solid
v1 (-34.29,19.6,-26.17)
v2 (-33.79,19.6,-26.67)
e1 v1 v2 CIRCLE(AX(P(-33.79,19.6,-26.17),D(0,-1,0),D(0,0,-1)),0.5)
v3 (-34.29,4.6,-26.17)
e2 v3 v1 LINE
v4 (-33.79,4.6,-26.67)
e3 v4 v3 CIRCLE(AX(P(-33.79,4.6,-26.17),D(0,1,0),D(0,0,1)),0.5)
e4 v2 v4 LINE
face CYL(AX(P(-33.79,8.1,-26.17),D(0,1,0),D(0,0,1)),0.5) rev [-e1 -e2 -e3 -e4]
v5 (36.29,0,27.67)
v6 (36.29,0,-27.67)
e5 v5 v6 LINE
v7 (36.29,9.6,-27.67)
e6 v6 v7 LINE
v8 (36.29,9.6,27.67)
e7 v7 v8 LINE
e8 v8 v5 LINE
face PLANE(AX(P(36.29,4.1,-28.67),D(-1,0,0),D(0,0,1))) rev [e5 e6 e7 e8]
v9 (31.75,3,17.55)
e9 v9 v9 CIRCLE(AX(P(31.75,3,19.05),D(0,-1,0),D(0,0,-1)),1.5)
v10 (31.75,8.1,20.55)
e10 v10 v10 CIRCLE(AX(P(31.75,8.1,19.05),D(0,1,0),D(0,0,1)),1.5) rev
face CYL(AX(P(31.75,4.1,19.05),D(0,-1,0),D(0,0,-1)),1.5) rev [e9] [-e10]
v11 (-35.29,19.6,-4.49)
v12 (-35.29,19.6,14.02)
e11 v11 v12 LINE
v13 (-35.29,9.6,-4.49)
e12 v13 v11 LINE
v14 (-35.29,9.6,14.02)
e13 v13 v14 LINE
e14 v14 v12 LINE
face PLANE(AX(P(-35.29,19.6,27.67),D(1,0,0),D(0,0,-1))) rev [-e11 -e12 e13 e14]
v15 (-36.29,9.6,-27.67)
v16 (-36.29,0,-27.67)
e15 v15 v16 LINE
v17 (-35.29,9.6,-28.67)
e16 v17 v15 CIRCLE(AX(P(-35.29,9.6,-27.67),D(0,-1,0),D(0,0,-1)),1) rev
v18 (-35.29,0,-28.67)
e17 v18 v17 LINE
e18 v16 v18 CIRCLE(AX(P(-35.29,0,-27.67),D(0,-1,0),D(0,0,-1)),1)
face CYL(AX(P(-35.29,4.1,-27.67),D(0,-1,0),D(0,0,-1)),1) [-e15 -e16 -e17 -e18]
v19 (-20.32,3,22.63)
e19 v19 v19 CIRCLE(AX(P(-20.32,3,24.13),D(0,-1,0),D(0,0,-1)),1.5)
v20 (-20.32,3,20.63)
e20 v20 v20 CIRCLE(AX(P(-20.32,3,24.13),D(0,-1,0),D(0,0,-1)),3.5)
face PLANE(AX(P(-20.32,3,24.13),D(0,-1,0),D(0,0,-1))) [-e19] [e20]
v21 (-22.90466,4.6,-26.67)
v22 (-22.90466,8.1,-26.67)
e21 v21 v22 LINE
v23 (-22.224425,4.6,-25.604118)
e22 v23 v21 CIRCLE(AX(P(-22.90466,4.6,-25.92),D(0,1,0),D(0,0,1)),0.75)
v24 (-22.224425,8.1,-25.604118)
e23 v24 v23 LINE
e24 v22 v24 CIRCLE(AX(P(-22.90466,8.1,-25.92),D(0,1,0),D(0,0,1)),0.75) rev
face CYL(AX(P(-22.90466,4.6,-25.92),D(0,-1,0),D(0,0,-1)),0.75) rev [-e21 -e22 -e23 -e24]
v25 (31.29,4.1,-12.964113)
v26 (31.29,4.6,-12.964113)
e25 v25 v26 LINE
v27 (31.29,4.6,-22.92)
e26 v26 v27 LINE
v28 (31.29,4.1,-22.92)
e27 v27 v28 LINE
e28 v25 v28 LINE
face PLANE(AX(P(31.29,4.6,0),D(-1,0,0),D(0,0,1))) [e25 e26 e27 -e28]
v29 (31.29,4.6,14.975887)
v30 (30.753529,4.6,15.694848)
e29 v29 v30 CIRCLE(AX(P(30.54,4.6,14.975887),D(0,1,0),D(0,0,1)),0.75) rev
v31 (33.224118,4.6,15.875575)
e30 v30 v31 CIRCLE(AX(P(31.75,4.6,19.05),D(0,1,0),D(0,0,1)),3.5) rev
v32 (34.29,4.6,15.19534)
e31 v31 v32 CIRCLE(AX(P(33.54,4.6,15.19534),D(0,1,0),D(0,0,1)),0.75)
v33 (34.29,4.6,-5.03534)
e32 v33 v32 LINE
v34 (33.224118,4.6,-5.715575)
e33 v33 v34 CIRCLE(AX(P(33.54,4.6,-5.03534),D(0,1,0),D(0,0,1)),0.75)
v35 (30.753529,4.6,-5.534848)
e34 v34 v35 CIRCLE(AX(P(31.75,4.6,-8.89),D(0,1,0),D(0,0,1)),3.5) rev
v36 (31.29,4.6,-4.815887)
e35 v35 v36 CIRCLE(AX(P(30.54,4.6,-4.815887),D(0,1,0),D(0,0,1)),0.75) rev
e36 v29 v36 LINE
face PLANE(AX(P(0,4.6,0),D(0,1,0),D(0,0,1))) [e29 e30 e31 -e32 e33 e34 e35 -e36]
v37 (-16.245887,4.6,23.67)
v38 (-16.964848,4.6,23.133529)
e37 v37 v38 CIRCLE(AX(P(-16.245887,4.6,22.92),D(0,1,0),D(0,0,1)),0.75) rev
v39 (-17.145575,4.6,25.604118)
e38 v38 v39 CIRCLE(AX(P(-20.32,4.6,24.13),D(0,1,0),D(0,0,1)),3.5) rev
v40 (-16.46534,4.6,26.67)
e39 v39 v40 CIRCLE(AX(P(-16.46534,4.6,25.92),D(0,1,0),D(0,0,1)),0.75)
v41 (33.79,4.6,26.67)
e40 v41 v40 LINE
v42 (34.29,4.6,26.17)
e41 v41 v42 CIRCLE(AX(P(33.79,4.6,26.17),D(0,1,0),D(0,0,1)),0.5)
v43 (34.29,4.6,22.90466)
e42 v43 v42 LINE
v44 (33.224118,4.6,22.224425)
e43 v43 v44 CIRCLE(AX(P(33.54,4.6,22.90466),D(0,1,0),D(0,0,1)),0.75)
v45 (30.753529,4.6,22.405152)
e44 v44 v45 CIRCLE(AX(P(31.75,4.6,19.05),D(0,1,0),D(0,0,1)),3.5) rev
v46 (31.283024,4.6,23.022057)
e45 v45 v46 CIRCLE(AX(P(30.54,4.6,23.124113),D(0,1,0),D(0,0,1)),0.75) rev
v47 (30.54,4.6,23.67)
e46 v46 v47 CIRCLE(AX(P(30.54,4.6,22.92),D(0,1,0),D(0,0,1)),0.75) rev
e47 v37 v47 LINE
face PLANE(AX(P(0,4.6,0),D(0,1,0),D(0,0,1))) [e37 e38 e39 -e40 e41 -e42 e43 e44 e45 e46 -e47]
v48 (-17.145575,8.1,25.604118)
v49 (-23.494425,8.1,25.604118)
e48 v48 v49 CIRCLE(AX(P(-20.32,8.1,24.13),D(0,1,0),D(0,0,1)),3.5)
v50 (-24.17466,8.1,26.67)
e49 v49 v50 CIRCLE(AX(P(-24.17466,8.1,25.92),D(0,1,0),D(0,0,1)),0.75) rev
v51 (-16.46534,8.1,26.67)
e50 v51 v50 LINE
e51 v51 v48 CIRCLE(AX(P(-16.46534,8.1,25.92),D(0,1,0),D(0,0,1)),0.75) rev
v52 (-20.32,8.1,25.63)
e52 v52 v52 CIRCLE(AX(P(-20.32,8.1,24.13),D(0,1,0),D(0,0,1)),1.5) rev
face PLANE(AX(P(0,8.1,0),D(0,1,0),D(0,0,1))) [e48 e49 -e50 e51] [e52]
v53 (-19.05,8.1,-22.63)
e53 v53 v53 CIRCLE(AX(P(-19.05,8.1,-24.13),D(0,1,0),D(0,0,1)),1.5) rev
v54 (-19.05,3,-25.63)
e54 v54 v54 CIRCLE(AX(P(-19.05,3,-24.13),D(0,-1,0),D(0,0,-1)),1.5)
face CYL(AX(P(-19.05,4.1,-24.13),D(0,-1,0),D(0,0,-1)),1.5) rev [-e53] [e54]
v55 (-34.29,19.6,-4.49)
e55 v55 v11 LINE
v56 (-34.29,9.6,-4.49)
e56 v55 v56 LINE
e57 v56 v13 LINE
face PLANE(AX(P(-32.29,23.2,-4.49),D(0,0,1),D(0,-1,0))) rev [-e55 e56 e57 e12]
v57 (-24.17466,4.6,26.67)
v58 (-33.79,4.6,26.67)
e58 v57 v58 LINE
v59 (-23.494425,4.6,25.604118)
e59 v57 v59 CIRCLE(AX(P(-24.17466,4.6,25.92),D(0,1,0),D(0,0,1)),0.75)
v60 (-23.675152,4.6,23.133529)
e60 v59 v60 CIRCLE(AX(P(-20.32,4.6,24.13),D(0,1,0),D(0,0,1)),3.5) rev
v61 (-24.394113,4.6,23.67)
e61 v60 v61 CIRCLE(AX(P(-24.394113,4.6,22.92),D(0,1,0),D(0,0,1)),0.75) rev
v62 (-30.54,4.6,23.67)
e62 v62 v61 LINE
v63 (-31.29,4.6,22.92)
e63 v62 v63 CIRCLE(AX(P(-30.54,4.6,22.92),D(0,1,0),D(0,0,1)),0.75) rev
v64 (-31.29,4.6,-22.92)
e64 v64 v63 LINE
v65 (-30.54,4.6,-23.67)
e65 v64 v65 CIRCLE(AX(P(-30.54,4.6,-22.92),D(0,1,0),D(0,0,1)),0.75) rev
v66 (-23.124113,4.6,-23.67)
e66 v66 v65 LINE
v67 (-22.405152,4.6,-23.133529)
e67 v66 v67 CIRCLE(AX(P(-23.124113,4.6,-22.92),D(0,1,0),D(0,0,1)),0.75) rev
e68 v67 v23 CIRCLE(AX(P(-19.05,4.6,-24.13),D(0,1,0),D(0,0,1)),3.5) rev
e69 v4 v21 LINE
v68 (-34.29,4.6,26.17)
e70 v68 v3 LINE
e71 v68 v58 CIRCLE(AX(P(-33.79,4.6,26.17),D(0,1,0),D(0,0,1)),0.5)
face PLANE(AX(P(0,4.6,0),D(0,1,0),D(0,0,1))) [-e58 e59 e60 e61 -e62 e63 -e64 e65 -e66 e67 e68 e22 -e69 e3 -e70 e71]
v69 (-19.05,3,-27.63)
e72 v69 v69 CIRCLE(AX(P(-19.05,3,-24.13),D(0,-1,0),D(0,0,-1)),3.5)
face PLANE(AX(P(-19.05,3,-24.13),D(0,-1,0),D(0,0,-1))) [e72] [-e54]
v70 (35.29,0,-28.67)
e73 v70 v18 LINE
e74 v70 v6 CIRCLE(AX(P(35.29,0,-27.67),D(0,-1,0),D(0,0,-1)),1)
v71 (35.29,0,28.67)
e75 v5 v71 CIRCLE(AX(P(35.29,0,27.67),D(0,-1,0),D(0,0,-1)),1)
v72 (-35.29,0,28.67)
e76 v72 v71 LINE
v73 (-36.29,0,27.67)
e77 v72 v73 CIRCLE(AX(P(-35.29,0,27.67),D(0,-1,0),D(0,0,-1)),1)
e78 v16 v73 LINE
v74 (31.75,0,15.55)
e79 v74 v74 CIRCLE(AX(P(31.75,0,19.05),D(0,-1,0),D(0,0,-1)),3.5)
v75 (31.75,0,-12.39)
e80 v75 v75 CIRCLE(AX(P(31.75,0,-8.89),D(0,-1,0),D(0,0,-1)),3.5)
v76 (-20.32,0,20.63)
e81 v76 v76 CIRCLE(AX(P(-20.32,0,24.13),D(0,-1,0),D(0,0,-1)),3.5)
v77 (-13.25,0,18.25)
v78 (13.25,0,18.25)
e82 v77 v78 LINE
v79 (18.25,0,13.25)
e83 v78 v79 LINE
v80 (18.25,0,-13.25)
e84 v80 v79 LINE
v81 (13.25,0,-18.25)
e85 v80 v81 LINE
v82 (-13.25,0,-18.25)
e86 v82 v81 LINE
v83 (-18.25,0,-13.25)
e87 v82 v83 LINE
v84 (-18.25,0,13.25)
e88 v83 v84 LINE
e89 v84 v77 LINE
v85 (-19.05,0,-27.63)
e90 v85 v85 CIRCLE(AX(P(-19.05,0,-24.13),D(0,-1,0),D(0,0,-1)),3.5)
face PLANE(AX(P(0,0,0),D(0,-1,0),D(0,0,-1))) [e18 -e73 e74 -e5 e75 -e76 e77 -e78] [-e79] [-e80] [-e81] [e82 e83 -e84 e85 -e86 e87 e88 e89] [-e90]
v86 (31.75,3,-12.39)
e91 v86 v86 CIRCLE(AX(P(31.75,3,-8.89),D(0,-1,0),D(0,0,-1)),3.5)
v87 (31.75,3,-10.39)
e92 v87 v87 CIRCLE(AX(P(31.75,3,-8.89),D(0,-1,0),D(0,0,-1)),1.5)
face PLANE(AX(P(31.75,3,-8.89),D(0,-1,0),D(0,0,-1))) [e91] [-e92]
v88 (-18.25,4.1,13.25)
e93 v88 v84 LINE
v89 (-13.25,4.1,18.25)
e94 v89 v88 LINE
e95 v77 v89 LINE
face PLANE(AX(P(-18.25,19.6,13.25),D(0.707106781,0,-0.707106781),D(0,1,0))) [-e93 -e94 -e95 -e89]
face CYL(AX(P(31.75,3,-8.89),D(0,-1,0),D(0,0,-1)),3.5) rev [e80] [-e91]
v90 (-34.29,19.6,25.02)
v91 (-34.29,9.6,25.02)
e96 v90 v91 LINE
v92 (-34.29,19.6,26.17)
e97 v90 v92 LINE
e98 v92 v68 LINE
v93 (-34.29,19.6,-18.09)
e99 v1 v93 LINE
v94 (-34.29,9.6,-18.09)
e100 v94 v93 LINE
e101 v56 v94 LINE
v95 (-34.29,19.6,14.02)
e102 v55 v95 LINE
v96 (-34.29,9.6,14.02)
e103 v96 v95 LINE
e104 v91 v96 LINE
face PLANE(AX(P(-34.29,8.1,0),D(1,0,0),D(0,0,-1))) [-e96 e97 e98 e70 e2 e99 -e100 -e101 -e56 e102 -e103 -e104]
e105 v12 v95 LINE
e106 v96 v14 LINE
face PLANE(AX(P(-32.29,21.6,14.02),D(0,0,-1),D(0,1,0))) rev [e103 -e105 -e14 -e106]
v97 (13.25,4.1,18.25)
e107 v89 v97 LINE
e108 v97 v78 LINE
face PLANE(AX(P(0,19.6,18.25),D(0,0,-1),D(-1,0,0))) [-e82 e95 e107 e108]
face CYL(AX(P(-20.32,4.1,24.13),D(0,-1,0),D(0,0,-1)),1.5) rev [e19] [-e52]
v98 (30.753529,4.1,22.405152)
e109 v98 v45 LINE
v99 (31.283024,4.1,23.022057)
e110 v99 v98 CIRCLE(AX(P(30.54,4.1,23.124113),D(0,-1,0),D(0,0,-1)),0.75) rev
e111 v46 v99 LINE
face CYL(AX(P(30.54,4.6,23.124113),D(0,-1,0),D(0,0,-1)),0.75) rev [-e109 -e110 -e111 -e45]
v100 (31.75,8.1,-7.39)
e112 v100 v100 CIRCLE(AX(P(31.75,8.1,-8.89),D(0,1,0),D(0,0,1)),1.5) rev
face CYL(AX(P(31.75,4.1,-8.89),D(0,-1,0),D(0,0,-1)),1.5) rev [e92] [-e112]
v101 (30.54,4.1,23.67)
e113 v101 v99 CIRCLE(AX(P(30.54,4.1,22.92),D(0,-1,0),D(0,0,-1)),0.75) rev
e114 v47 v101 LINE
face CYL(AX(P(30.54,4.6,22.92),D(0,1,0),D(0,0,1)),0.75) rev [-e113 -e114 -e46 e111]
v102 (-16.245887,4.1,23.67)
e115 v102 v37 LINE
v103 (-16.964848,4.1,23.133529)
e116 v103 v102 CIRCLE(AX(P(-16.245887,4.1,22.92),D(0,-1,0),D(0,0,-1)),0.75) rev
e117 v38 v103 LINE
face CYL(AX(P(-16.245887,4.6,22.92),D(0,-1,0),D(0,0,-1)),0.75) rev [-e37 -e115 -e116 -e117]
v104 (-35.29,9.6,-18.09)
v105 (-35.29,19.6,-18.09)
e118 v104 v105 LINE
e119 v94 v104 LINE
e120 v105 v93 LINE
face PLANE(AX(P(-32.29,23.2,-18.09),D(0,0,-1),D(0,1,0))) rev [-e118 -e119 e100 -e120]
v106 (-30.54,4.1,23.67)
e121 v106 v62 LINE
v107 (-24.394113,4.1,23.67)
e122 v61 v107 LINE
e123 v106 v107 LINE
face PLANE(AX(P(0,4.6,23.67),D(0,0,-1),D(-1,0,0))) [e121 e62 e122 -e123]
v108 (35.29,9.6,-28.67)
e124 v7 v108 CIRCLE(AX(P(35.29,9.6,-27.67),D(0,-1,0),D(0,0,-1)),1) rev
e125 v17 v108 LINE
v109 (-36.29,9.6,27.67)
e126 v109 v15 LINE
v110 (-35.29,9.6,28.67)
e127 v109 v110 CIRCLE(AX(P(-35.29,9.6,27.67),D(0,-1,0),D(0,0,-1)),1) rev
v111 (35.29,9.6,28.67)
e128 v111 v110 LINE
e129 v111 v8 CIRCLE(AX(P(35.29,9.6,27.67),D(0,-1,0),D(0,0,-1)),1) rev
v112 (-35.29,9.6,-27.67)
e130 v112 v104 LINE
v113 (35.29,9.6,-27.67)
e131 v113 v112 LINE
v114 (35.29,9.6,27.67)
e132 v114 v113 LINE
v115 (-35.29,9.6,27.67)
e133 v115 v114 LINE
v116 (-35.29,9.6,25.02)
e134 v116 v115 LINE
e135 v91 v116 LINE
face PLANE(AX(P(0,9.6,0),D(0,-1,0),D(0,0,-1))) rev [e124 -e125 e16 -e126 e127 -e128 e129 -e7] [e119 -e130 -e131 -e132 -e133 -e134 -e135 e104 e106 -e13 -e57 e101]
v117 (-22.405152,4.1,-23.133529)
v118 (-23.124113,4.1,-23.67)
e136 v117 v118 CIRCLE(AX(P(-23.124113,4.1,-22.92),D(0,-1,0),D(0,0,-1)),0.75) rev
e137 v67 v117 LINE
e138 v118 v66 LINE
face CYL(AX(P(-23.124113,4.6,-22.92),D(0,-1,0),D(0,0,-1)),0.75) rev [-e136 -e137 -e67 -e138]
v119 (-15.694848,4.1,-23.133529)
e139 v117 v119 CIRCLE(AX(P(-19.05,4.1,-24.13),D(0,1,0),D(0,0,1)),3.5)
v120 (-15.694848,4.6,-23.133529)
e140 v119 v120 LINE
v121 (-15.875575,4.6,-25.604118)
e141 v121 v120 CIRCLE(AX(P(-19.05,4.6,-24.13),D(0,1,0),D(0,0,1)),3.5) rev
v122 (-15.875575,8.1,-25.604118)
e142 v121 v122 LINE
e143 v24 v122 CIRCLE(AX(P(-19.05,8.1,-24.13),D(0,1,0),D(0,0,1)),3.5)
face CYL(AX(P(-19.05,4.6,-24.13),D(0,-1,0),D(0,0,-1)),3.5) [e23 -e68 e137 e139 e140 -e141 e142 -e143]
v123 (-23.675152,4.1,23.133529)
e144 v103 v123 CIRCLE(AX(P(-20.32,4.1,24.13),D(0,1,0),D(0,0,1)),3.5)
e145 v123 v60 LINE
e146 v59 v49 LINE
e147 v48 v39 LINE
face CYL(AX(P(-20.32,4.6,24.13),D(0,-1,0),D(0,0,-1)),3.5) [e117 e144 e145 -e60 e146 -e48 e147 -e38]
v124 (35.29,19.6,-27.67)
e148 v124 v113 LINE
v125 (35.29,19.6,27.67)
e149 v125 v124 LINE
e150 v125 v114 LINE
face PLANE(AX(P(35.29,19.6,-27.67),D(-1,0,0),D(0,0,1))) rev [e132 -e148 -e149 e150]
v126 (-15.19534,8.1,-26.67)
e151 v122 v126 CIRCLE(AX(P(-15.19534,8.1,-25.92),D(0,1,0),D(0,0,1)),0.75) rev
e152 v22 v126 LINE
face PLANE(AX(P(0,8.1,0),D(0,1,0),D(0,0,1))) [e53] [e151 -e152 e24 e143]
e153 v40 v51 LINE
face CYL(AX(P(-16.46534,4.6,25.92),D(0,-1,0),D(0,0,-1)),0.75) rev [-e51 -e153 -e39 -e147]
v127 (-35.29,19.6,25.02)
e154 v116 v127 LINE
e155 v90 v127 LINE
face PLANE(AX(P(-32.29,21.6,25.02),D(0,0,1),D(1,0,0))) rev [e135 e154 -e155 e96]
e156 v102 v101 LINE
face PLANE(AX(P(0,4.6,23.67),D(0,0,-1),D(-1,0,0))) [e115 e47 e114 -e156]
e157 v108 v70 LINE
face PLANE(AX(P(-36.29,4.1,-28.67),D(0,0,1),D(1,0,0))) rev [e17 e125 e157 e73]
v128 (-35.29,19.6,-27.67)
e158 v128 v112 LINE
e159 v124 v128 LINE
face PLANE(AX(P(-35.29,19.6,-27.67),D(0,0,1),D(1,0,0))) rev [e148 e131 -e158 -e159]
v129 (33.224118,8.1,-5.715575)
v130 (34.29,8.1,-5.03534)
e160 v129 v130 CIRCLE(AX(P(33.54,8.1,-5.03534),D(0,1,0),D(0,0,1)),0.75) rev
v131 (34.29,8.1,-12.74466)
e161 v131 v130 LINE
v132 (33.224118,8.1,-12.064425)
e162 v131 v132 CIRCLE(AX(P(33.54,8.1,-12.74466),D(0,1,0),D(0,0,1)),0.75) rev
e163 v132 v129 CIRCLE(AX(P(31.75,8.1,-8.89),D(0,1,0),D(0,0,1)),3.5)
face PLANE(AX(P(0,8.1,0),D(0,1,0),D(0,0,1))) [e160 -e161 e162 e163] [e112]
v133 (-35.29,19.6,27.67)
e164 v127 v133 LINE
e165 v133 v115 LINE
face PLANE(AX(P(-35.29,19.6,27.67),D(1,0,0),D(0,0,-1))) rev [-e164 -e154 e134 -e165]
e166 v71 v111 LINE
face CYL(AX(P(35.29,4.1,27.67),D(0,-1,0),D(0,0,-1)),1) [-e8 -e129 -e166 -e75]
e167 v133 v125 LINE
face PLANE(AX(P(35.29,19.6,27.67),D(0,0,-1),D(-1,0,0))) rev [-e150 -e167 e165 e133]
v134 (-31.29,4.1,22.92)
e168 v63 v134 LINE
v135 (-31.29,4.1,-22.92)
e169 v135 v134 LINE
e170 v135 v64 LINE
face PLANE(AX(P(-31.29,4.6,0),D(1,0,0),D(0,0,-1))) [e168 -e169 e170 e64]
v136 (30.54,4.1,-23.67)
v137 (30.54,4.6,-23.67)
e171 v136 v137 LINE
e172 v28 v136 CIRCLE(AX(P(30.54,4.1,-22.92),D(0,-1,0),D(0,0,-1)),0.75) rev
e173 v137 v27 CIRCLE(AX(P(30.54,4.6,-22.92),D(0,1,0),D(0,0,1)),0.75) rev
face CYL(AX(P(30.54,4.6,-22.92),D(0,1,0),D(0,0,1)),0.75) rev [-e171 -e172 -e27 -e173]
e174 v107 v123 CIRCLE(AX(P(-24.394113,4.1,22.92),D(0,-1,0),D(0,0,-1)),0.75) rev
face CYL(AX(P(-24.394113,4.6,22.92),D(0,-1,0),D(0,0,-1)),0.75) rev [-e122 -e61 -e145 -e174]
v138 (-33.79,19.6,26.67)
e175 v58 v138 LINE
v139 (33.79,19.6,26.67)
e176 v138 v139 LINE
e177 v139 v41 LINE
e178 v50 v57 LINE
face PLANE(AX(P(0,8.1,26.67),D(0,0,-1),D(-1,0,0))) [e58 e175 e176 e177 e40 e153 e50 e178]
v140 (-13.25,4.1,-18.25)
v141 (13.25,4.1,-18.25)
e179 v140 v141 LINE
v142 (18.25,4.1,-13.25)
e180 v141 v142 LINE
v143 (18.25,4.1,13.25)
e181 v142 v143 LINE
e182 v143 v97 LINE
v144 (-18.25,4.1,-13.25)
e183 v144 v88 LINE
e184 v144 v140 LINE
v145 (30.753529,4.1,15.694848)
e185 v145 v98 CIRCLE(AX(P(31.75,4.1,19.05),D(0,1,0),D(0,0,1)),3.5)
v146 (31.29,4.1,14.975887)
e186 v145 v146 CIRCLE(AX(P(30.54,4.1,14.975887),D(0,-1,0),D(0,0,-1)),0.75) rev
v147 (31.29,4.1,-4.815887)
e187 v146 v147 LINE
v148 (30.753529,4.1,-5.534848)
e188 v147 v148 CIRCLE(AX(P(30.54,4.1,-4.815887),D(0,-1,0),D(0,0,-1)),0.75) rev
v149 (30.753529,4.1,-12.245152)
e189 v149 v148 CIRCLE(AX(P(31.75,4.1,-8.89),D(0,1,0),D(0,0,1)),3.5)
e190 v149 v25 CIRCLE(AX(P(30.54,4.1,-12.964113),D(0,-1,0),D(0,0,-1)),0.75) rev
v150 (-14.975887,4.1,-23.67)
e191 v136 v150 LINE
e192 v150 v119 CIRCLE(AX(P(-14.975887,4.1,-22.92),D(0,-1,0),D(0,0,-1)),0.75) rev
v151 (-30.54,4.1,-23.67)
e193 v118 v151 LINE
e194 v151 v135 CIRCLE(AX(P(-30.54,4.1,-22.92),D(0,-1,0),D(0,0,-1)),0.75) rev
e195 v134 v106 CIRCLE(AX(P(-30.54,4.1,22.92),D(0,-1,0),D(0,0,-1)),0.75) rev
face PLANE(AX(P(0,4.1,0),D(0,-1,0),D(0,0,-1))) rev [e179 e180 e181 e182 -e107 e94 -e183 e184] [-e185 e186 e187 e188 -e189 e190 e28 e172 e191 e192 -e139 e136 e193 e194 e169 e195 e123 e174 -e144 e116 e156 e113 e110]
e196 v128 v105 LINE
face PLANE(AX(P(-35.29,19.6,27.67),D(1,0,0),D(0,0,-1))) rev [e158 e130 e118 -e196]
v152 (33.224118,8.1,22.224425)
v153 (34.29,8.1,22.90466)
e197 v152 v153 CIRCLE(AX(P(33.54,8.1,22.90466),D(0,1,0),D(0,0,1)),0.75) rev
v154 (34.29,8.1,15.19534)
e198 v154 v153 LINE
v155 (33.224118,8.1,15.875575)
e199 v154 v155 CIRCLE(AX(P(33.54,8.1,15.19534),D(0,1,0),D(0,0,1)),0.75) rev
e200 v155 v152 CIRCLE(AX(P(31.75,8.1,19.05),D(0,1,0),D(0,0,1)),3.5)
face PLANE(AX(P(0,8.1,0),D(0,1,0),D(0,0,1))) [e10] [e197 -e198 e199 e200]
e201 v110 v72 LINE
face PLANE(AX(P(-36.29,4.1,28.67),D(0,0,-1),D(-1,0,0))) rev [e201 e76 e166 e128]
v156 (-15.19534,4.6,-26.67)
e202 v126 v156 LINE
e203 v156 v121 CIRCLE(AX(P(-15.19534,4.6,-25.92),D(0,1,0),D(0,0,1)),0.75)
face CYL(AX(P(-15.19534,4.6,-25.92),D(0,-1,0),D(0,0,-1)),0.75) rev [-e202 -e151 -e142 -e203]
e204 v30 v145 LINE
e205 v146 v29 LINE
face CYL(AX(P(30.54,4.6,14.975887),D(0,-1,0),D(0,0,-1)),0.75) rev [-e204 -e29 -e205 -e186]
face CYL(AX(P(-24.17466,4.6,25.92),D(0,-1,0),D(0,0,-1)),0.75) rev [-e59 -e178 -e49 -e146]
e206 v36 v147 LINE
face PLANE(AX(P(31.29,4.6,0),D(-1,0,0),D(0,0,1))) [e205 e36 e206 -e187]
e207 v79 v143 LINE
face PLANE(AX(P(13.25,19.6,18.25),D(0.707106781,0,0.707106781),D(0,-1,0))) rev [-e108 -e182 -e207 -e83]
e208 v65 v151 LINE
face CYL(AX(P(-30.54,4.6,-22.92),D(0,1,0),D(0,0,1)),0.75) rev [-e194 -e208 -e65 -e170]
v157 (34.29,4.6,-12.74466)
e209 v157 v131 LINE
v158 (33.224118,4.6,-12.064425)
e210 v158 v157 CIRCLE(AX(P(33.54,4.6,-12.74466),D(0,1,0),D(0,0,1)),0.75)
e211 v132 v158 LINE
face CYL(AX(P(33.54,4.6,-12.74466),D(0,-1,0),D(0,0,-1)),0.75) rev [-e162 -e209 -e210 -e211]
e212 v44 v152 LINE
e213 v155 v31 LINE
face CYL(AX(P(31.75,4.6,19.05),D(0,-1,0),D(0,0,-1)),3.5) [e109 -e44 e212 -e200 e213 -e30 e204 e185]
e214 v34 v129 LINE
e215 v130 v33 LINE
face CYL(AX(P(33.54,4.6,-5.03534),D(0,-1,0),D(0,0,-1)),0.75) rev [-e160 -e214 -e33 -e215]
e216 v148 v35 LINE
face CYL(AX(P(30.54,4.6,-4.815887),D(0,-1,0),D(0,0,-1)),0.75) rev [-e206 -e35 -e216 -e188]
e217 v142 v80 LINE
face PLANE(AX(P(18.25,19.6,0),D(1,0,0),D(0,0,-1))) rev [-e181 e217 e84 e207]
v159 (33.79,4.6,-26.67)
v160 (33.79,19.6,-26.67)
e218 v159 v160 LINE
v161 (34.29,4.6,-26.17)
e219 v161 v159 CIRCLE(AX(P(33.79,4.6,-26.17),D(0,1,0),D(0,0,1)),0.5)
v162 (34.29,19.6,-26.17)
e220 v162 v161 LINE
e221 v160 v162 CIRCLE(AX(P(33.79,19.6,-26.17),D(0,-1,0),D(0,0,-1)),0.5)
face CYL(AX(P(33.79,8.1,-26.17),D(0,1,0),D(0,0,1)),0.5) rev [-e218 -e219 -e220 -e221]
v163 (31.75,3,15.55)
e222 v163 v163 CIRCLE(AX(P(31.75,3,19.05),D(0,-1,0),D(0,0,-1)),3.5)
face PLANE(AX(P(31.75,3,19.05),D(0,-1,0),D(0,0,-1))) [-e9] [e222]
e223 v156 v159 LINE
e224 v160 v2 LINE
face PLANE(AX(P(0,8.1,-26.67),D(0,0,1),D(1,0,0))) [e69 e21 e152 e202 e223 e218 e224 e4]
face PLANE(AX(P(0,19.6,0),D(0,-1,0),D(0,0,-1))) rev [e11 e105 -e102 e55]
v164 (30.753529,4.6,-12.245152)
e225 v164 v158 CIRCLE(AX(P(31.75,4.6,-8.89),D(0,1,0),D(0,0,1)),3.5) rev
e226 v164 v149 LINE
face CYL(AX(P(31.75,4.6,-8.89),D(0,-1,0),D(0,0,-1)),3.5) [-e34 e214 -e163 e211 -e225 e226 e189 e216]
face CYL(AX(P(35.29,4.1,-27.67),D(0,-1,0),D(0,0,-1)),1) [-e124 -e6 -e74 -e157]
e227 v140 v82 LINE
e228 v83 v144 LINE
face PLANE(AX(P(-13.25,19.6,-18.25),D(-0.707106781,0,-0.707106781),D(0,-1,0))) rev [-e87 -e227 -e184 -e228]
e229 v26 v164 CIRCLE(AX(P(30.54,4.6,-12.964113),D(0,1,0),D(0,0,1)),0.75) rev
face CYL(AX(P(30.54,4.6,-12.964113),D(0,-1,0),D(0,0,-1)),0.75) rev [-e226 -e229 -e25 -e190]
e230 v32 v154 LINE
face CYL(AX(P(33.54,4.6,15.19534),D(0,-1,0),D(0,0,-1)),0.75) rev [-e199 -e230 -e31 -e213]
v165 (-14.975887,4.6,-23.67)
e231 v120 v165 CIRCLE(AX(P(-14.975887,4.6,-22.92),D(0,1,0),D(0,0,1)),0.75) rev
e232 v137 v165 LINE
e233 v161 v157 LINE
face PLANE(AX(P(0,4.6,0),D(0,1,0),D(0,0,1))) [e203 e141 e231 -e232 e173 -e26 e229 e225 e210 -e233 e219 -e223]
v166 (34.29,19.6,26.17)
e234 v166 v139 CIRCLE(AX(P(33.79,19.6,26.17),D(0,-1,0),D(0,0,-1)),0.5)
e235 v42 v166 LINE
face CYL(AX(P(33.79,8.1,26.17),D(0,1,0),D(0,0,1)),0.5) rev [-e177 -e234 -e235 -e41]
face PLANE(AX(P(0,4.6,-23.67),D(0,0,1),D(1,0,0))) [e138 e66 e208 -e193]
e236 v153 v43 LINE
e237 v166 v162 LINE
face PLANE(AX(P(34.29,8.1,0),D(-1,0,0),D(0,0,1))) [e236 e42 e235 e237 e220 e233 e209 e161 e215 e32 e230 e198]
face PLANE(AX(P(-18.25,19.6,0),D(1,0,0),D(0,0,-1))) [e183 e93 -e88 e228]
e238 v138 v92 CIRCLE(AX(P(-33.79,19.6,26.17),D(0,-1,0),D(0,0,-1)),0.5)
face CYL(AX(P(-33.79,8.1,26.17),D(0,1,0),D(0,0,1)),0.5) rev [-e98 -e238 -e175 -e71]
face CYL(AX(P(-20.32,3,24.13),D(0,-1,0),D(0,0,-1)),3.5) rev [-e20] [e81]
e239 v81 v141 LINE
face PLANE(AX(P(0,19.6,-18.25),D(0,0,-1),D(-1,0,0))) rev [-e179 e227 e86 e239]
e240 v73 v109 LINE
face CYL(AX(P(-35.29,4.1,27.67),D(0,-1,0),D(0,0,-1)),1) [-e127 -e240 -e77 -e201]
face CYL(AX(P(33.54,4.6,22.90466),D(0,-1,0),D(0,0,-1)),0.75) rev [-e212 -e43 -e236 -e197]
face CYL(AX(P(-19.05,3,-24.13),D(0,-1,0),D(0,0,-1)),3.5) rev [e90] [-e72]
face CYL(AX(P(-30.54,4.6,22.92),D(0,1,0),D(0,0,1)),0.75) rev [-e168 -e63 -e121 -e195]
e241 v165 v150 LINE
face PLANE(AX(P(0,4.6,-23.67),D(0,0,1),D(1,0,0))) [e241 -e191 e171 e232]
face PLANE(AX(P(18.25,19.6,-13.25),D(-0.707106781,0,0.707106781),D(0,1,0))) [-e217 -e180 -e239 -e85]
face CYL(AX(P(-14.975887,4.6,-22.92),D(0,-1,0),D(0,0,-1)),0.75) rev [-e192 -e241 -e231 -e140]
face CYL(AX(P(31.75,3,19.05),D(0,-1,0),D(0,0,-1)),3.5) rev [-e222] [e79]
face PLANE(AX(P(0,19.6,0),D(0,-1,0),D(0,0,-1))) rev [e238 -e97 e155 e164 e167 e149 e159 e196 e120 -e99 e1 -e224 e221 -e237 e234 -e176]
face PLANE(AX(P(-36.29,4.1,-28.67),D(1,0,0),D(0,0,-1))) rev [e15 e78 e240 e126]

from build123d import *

# Parameters (mm, degrees)
SKETCH1_W                 = 72.58
SKETCH1_H                 = 57.34
SKETCH1_R                 = 1.5
BOSS_EXTRUDE1_DEPTH       = 4.1
SKETCH2_W                 = 72.58
SKETCH2_H                 = 57.34
SKETCH2_R                 = 1.5
BOSS_EXTRUDE2_DEPTH       = 0.5
SKETCH2_4_W               = 72.58
SKETCH2_4_H               = 57.34
SKETCH2_4_R               = 1.5
BOSS_EXTRUDE3_DEPTH       = 4
BOSS_EXTRUDE4_START       = 4
BOSS_EXTRUDE4_OUTLINE_W   = 72.58
BOSS_EXTRUDE4_OUTLINE_H   = 57.34
BOSS_EXTRUDE4_OUTLINE_W_2 = 68.58
BOSS_EXTRUDE4_OUTLINE_H_2 = 53.34
BOSS_EXTRUDE4_DEPTH       = 1.5
SKETCH4_W                 = 70.58
SKETCH4_H                 = 55.34
SKETCH4_W_2               = 68.58
SKETCH4_H_2               = 53.34
BOSS_EXTRUDE5_DEPTH       = 10
FILLET1_R                 = 1
FILLET2_R                 = 0.5
FILLET3_R                 = 0.75
SKETCH3_W                 = 36.5
SKETCH3_H                 = 36.5
CUT_EXTRUDE1_DEPTH        = 51.230399162
SKETCH6_W                 = 11
SKETCH6_H                 = 12
SKETCH6_W_2               = 13.6
SKETCH6_H_2               = 13.6
CUT_EXTRUDE2_DEPTH        = 3
CHAMFER1_SIZE             = 5
SKETCH7_R                 = 3.5
SKETCH7_R_2               = 1.5
CUT_EXTRUDE3_DEPTH        = 3


# Read off the part's stored shape, not the designer's step: Boss-Extrude4
with BuildPart() as part:
    # Sketch1 → Boss-Extrude1 (new body)
    with BuildSketch(Plane(origin=(0, 0, 0), x_dir=(1, 0, 0), z_dir=(0, 1, 0))):
        Rectangle(SKETCH1_W, SKETCH1_H)
        with Locations(Location((-19.05, 24.13, 0), (0, 0, 270))):
            Circle(SKETCH1_R, mode=Mode.SUBTRACT)
        with Locations(Location((31.75, 8.89, 0), (0, 0, 270))):
            Circle(SKETCH1_R, mode=Mode.SUBTRACT)
        with Locations(Location((31.75, -19.05, 0), (0, 0, 270))):
            Circle(SKETCH1_R, mode=Mode.SUBTRACT)
        with Locations(Location((-20.32, -24.13, 0), (0, 0, 270))):
            Circle(SKETCH1_R, mode=Mode.SUBTRACT)
    extrude(amount=BOSS_EXTRUDE1_DEPTH)

    # Sketch2 → Boss-Extrude2 (add)
    with BuildSketch(Plane(origin=(0, 4.1, 0), x_dir=(1, 0, 0), z_dir=(0, 1, 0))):
        Rectangle(SKETCH2_W, SKETCH2_H)
        with BuildLine():
            Line((-31.29, -23.67), (-31.29, 23.67))
            Line((-31.29, 23.67), (-22.519639751, 23.67))
            ThreePointArc((-22.519639751, 23.67), (-19.05, 20.63), (-15.580360249, 23.67))
            Line((-15.580360249, 23.67), (31.29, 23.67))
            Line((31.29, 23.67), (31.29, 12.359639751))
            ThreePointArc((31.29, 12.359639751), (28.25, 8.89), (31.29, 5.420360249))
            Line((31.29, 5.420360249), (31.29, -15.580360249))
            ThreePointArc((31.29, -15.580360249), (28.25, -19.05), (31.29, -22.519639751))
            Line((31.29, -22.519639751), (31.29, -23.67))
            Line((31.29, -23.67), (-16.850360249, -23.67))
            ThreePointArc((-16.850360249, -23.67), (-20.32, -20.63), (-23.789639751, -23.67))
            Line((-23.789639751, -23.67), (-31.29, -23.67))
        make_face(mode=Mode.SUBTRACT)
        with Locations(Location((31.75, 8.89, 0), (0, 0, 270))):
            Circle(SKETCH2_R, mode=Mode.SUBTRACT)
        with Locations(Location((-19.05, 24.13, 0), (0, 0, 270))):
            Circle(SKETCH2_R, mode=Mode.SUBTRACT)
        with Locations(Location((-20.32, -24.13, 0), (0, 0, 270))):
            Circle(SKETCH2_R, mode=Mode.SUBTRACT)
        with Locations(Location((31.75, -19.05, 0), (0, 0, 270))):
            Circle(SKETCH2_R, mode=Mode.SUBTRACT)
    extrude(amount=BOSS_EXTRUDE2_DEPTH)

    # Sketch2<4> → Boss-Extrude3 (add)
    with BuildSketch(Plane(origin=(0, 4.1, 0), x_dir=(1, 0, 0), z_dir=(0, 1, 0))):
        Rectangle(SKETCH2_4_W, SKETCH2_4_H)
        with BuildLine():
            ThreePointArc((-21.457986711, 26.67), (-19.05, 20.63), (-16.642013289, 26.67))
            Line((-16.642013289, 26.67), (34.29, 26.67))
            Line((34.29, 26.67), (34.29, 11.297986711))
            ThreePointArc((34.29, 11.297986711), (28.25, 8.89), (34.29, 6.482013289))
            Line((34.29, 6.482013289), (34.29, -16.642013289))
            ThreePointArc((34.29, -16.642013289), (28.25, -19.05), (34.29, -21.457986711))
            Line((34.29, -21.457986711), (34.29, -26.67))
            Line((34.29, -26.67), (-17.912013289, -26.67))
            ThreePointArc((-17.912013289, -26.67), (-20.32, -20.63), (-22.727986711, -26.67))
            Line((-22.727986711, -26.67), (-34.29, -26.67))
            Line((-34.29, -26.67), (-34.29, 26.67))
            Line((-34.29, 26.67), (-21.457986711, 26.67))
        make_face(mode=Mode.SUBTRACT)
        with Locations(Location((-19.05, 24.13, 0), (0, 0, 270))):
            Circle(SKETCH2_4_R, mode=Mode.SUBTRACT)
        with Locations(Location((-20.32, -24.13, 0), (0, 0, 270))):
            Circle(SKETCH2_4_R, mode=Mode.SUBTRACT)
        with Locations(Location((31.75, -19.05, 0), (0, 0, 270))):
            Circle(SKETCH2_4_R, mode=Mode.SUBTRACT)
        with Locations(Location((31.75, 8.89, 0), (0, 0, 270))):
            Circle(SKETCH2_4_R, mode=Mode.SUBTRACT)
    extrude(amount=BOSS_EXTRUDE3_DEPTH)

    # Boss-Extrude4 outline → Boss-Extrude4 (add)
    with BuildSketch(Plane(origin=(0, 4.1, 0), x_dir=(1, 0, 0), z_dir=(0, 1, 0)).offset(BOSS_EXTRUDE4_START)):
        Rectangle(BOSS_EXTRUDE4_OUTLINE_W, BOSS_EXTRUDE4_OUTLINE_H)
        Rectangle(BOSS_EXTRUDE4_OUTLINE_W_2, BOSS_EXTRUDE4_OUTLINE_H_2, mode=Mode.SUBTRACT)
    extrude(amount=BOSS_EXTRUDE4_DEPTH)

    # Sketch4 → Boss-Extrude5 (add)
    with BuildSketch(Plane(origin=(0, 9.6, 0), x_dir=(1, 0, 0), z_dir=(0, 1, 0))):
        Rectangle(SKETCH4_W, SKETCH4_H)
        Rectangle(SKETCH4_W_2, SKETCH4_H_2, mode=Mode.SUBTRACT)
    extrude(amount=BOSS_EXTRUDE5_DEPTH)

    # Fillet1
    fillet1_edges = [part.edges().sort_by_distance(p)[0] for p in [
        (36.29, 4.8, -28.67),
        (36.29, 4.8, 28.67),
        (-36.29, 4.8, 28.67),
        (-36.29, 4.8, -28.67),
    ]]
    fillet(fillet1_edges, radius=FILLET1_R)

    # Fillet2
    fillet2_edges = [part.edges().sort_by_distance(p)[0] for p in [
        (34.29, 12.1, 26.67),
        (-34.29, 12.1, 26.67),
        (-34.29, 12.1, -26.67),
        (34.29, 12.1, -26.67),
    ]]
    fillet(fillet2_edges, radius=FILLET2_R)

    # Fillet3
    # the kernel refuses this fillet: 0.75 mm, written as the material it adds along each edge
    with BuildSketch(Plane(origin=(-17.912013289, 0.983317982, 26.67), x_dir=(1, 0, 0), z_dir=(0, 1, 0)), Plane(origin=(-21.457986711, 0.983317982, -26.67), x_dir=(-1, 0, 0), z_dir=(0, 1, 0)), Plane(origin=(34.29, 0.983317982, -11.297986711), x_dir=(0, 0, -1), z_dir=(0, 1, 0)), Plane(origin=(34.29, 0.983317982, 16.642013289), x_dir=(0, 0, -1), z_dir=(0, 1, 0))) as fillet3_piece_1:
        with BuildLine():
            CenterArc((1.446672807, 0.75), FILLET3_R, 155.091114703, 114.908885297)
            ThreePointArc((0.766438775, 1.065882353), (0.433642713, 0.496683524), (0, 0))
            Line((0, 0), (1.446672807, 0))
        make_face()
    extrude(amount=7.116682018)
    with BuildSketch(Plane(origin=(-22.727986711, 0.983317982, 26.67), x_dir=(-1, 0, 0), z_dir=(0, 1, 0)), Plane(origin=(-16.642013289, 0.983317982, -26.67), x_dir=(1, 0, 0), z_dir=(0, 1, 0)), Plane(origin=(34.29, 0.983317982, -6.482013289), x_dir=(0, 0, 1), z_dir=(0, 1, 0)), Plane(origin=(34.29, 0.983317982, 21.457986711), x_dir=(0, 0, 1), z_dir=(0, 1, 0))) as fillet3_piece_2:
        with BuildLine():
            CenterArc((1.446672807, -0.75), FILLET3_R, 90, 114.908885297)
            ThreePointArc((0.766438775, -1.065882353), (0.433642713, -0.496683524), (0, 0))
            Line((0, 0), (1.446672807, 0))
        make_face()
    extrude(amount=7.116682018)
    with BuildSketch(Plane(origin=(31.29, 2.225, -23.67), x_dir=(-1, 0, 0), z_dir=(0, 1, 0)), Plane(origin=(31.29, 2.225, 23.67), x_dir=(0, 0, -1), z_dir=(0, 1, 0)), Plane(origin=(-31.29, 2.225, 23.67), x_dir=(1, 0, 0), z_dir=(0, 1, 0)), Plane(origin=(-31.29, 2.225, -23.67), x_dir=(0, 0, 1), z_dir=(0, 1, 0))) as fillet3_piece_3:
        with BuildLine():
            CenterArc((FILLET3_R, FILLET3_R), FILLET3_R, 180, 90)
            Line((0, FILLET3_R), (0, 0))
            Line((0, 0), (FILLET3_R, 0))
        make_face()
    extrude(amount=2.375)
    with BuildSketch(Plane(origin=(31.29, 2.588815876, -12.359639751), x_dir=(-0.977977776437884, 0, 0.20870905297473832), z_dir=(0, 1, 0)), Plane(origin=(31.29, 2.588815876, 15.580360249), x_dir=(-0.9779777764378829, 0, 0.2087090529747441), z_dir=(0, 1, 0)), Plane(origin=(-16.850360249, 2.588815876, 23.67), x_dir=(-0.2087090529747233, 0, -0.9779777764378872), z_dir=(0, 1, 0)), Plane(origin=(-22.519639751, 2.588815876, -23.67), x_dir=(0.20870905297473083, 0, 0.9779777764378856), z_dir=(0, 1, 0))) as fillet3_piece_4:
        with BuildLine():
            CenterArc((0.607324209, -0.747693586), FILLET3_R, 94.494558388, 73.458731432)
            Line((-0.126159123, -0.591161796), (0, 0))
            ThreePointArc((0, 0), (0.274275449, -0.010763267), (0.548550899, 0))
        make_face()
    extrude(amount=2.011184124)
    with BuildSketch(Plane(origin=(31.29, 2.588815876, -5.420360249), x_dir=(-0.9779777764378846, 0, -0.20870905297473547), z_dir=(0, 1, 0)), Plane(origin=(31.29, 2.588815876, 22.519639751), x_dir=(-0.9779777764378821, 0, -0.20870905297474715), z_dir=(0, 1, 0)), Plane(origin=(-23.789639751, 2.588815876, 23.67), x_dir=(0.20870905297472817, 0, -0.9779777764378861), z_dir=(0, 1, 0)), Plane(origin=(-15.580360249, 2.588815876, -23.67), x_dir=(-0.2087090529747233, 0, 0.9779777764378872), z_dir=(0, 1, 0))) as fillet3_piece_5:
        with BuildLine():
            CenterArc((0.607324209, 0.747693586), FILLET3_R, 192.04671018, 73.458731432)
            Line((-0.126159123, 0.591161796), (0, 0))
            ThreePointArc((0, 0), (0.274275449, 0.010763267), (0.548550899, 0))
        make_face()
    extrude(amount=2.011184124)

    # Sketch3 → Cut-Extrude1 (cut, through all)
    with BuildSketch(Plane(origin=(0, 0, 0), x_dir=(1, 0, 0), z_dir=(0, 1, 0))):
        Rectangle(SKETCH3_W, SKETCH3_H)
    extrude(amount=CUT_EXTRUDE1_DEPTH, mode=Mode.SUBTRACT)

    # Sketch6 → Cut-Extrude2 (cut)
    with BuildSketch(Plane.ZY.offset(35.29)):
        with Locations((19.52, 15.6)):
            Rectangle(SKETCH6_W, SKETCH6_H)
        with Locations((-11.29, 16.4)):
            Rectangle(SKETCH6_W_2, SKETCH6_H_2)
    extrude(amount=-CUT_EXTRUDE2_DEPTH, mode=Mode.SUBTRACT)

    # Chamfer1
    chamfer1_edges = [part.edges().sort_by_distance(p)[0] for p in [
        (18.25, 2.05, 18.25),
        (18.25, 2.05, -18.25),
        (-18.25, 2.05, -18.25),
        (-18.25, 2.05, 18.25),
    ]]
    chamfer(chamfer1_edges, length=CHAMFER1_SIZE)

    # Sketch7 → Cut-Extrude3 (cut)
    # profile 1 of 4: a face of its own
    with BuildSketch(Plane.XZ):
        with Locations(Location((-20.32, 24.13, 0), (0, 0, 270))):
            Circle(SKETCH7_R)
        with Locations(Location((-20.32, 24.13, 0), (0, 0, 270))):
            Circle(SKETCH7_R_2, mode=Mode.SUBTRACT)
    # profile 2 of 4: a face of its own
    with BuildSketch(Plane.XZ):
        with Locations(Location((-19.05, -24.13, 0), (0, 0, 270))):
            Circle(SKETCH7_R)
        with Locations(Location((-19.05, -24.13, 0), (0, 0, 270))):
            Circle(SKETCH7_R_2, mode=Mode.SUBTRACT)
    # profile 3 of 4: a face of its own
    with BuildSketch(Plane.XZ):
        with Locations(Location((31.75, -8.89, 0), (0, 0, 270))):
            Circle(SKETCH7_R)
        with Locations(Location((31.75, -8.89, 0), (0, 0, 270))):
            Circle(SKETCH7_R_2, mode=Mode.SUBTRACT)
    # profile 4 of 4: a face of its own
    with BuildSketch(Plane.XZ):
        with Locations(Location((31.75, 19.05, 0), (0, 0, 270))):
            Circle(SKETCH7_R)
        with Locations(Location((31.75, 19.05, 0), (0, 0, 270))):
            Circle(SKETCH7_R_2, mode=Mode.SUBTRACT)
    extrude(amount=-CUT_EXTRUDE3_DEPTH, mode=Mode.SUBTRACT)


solid = part.part
